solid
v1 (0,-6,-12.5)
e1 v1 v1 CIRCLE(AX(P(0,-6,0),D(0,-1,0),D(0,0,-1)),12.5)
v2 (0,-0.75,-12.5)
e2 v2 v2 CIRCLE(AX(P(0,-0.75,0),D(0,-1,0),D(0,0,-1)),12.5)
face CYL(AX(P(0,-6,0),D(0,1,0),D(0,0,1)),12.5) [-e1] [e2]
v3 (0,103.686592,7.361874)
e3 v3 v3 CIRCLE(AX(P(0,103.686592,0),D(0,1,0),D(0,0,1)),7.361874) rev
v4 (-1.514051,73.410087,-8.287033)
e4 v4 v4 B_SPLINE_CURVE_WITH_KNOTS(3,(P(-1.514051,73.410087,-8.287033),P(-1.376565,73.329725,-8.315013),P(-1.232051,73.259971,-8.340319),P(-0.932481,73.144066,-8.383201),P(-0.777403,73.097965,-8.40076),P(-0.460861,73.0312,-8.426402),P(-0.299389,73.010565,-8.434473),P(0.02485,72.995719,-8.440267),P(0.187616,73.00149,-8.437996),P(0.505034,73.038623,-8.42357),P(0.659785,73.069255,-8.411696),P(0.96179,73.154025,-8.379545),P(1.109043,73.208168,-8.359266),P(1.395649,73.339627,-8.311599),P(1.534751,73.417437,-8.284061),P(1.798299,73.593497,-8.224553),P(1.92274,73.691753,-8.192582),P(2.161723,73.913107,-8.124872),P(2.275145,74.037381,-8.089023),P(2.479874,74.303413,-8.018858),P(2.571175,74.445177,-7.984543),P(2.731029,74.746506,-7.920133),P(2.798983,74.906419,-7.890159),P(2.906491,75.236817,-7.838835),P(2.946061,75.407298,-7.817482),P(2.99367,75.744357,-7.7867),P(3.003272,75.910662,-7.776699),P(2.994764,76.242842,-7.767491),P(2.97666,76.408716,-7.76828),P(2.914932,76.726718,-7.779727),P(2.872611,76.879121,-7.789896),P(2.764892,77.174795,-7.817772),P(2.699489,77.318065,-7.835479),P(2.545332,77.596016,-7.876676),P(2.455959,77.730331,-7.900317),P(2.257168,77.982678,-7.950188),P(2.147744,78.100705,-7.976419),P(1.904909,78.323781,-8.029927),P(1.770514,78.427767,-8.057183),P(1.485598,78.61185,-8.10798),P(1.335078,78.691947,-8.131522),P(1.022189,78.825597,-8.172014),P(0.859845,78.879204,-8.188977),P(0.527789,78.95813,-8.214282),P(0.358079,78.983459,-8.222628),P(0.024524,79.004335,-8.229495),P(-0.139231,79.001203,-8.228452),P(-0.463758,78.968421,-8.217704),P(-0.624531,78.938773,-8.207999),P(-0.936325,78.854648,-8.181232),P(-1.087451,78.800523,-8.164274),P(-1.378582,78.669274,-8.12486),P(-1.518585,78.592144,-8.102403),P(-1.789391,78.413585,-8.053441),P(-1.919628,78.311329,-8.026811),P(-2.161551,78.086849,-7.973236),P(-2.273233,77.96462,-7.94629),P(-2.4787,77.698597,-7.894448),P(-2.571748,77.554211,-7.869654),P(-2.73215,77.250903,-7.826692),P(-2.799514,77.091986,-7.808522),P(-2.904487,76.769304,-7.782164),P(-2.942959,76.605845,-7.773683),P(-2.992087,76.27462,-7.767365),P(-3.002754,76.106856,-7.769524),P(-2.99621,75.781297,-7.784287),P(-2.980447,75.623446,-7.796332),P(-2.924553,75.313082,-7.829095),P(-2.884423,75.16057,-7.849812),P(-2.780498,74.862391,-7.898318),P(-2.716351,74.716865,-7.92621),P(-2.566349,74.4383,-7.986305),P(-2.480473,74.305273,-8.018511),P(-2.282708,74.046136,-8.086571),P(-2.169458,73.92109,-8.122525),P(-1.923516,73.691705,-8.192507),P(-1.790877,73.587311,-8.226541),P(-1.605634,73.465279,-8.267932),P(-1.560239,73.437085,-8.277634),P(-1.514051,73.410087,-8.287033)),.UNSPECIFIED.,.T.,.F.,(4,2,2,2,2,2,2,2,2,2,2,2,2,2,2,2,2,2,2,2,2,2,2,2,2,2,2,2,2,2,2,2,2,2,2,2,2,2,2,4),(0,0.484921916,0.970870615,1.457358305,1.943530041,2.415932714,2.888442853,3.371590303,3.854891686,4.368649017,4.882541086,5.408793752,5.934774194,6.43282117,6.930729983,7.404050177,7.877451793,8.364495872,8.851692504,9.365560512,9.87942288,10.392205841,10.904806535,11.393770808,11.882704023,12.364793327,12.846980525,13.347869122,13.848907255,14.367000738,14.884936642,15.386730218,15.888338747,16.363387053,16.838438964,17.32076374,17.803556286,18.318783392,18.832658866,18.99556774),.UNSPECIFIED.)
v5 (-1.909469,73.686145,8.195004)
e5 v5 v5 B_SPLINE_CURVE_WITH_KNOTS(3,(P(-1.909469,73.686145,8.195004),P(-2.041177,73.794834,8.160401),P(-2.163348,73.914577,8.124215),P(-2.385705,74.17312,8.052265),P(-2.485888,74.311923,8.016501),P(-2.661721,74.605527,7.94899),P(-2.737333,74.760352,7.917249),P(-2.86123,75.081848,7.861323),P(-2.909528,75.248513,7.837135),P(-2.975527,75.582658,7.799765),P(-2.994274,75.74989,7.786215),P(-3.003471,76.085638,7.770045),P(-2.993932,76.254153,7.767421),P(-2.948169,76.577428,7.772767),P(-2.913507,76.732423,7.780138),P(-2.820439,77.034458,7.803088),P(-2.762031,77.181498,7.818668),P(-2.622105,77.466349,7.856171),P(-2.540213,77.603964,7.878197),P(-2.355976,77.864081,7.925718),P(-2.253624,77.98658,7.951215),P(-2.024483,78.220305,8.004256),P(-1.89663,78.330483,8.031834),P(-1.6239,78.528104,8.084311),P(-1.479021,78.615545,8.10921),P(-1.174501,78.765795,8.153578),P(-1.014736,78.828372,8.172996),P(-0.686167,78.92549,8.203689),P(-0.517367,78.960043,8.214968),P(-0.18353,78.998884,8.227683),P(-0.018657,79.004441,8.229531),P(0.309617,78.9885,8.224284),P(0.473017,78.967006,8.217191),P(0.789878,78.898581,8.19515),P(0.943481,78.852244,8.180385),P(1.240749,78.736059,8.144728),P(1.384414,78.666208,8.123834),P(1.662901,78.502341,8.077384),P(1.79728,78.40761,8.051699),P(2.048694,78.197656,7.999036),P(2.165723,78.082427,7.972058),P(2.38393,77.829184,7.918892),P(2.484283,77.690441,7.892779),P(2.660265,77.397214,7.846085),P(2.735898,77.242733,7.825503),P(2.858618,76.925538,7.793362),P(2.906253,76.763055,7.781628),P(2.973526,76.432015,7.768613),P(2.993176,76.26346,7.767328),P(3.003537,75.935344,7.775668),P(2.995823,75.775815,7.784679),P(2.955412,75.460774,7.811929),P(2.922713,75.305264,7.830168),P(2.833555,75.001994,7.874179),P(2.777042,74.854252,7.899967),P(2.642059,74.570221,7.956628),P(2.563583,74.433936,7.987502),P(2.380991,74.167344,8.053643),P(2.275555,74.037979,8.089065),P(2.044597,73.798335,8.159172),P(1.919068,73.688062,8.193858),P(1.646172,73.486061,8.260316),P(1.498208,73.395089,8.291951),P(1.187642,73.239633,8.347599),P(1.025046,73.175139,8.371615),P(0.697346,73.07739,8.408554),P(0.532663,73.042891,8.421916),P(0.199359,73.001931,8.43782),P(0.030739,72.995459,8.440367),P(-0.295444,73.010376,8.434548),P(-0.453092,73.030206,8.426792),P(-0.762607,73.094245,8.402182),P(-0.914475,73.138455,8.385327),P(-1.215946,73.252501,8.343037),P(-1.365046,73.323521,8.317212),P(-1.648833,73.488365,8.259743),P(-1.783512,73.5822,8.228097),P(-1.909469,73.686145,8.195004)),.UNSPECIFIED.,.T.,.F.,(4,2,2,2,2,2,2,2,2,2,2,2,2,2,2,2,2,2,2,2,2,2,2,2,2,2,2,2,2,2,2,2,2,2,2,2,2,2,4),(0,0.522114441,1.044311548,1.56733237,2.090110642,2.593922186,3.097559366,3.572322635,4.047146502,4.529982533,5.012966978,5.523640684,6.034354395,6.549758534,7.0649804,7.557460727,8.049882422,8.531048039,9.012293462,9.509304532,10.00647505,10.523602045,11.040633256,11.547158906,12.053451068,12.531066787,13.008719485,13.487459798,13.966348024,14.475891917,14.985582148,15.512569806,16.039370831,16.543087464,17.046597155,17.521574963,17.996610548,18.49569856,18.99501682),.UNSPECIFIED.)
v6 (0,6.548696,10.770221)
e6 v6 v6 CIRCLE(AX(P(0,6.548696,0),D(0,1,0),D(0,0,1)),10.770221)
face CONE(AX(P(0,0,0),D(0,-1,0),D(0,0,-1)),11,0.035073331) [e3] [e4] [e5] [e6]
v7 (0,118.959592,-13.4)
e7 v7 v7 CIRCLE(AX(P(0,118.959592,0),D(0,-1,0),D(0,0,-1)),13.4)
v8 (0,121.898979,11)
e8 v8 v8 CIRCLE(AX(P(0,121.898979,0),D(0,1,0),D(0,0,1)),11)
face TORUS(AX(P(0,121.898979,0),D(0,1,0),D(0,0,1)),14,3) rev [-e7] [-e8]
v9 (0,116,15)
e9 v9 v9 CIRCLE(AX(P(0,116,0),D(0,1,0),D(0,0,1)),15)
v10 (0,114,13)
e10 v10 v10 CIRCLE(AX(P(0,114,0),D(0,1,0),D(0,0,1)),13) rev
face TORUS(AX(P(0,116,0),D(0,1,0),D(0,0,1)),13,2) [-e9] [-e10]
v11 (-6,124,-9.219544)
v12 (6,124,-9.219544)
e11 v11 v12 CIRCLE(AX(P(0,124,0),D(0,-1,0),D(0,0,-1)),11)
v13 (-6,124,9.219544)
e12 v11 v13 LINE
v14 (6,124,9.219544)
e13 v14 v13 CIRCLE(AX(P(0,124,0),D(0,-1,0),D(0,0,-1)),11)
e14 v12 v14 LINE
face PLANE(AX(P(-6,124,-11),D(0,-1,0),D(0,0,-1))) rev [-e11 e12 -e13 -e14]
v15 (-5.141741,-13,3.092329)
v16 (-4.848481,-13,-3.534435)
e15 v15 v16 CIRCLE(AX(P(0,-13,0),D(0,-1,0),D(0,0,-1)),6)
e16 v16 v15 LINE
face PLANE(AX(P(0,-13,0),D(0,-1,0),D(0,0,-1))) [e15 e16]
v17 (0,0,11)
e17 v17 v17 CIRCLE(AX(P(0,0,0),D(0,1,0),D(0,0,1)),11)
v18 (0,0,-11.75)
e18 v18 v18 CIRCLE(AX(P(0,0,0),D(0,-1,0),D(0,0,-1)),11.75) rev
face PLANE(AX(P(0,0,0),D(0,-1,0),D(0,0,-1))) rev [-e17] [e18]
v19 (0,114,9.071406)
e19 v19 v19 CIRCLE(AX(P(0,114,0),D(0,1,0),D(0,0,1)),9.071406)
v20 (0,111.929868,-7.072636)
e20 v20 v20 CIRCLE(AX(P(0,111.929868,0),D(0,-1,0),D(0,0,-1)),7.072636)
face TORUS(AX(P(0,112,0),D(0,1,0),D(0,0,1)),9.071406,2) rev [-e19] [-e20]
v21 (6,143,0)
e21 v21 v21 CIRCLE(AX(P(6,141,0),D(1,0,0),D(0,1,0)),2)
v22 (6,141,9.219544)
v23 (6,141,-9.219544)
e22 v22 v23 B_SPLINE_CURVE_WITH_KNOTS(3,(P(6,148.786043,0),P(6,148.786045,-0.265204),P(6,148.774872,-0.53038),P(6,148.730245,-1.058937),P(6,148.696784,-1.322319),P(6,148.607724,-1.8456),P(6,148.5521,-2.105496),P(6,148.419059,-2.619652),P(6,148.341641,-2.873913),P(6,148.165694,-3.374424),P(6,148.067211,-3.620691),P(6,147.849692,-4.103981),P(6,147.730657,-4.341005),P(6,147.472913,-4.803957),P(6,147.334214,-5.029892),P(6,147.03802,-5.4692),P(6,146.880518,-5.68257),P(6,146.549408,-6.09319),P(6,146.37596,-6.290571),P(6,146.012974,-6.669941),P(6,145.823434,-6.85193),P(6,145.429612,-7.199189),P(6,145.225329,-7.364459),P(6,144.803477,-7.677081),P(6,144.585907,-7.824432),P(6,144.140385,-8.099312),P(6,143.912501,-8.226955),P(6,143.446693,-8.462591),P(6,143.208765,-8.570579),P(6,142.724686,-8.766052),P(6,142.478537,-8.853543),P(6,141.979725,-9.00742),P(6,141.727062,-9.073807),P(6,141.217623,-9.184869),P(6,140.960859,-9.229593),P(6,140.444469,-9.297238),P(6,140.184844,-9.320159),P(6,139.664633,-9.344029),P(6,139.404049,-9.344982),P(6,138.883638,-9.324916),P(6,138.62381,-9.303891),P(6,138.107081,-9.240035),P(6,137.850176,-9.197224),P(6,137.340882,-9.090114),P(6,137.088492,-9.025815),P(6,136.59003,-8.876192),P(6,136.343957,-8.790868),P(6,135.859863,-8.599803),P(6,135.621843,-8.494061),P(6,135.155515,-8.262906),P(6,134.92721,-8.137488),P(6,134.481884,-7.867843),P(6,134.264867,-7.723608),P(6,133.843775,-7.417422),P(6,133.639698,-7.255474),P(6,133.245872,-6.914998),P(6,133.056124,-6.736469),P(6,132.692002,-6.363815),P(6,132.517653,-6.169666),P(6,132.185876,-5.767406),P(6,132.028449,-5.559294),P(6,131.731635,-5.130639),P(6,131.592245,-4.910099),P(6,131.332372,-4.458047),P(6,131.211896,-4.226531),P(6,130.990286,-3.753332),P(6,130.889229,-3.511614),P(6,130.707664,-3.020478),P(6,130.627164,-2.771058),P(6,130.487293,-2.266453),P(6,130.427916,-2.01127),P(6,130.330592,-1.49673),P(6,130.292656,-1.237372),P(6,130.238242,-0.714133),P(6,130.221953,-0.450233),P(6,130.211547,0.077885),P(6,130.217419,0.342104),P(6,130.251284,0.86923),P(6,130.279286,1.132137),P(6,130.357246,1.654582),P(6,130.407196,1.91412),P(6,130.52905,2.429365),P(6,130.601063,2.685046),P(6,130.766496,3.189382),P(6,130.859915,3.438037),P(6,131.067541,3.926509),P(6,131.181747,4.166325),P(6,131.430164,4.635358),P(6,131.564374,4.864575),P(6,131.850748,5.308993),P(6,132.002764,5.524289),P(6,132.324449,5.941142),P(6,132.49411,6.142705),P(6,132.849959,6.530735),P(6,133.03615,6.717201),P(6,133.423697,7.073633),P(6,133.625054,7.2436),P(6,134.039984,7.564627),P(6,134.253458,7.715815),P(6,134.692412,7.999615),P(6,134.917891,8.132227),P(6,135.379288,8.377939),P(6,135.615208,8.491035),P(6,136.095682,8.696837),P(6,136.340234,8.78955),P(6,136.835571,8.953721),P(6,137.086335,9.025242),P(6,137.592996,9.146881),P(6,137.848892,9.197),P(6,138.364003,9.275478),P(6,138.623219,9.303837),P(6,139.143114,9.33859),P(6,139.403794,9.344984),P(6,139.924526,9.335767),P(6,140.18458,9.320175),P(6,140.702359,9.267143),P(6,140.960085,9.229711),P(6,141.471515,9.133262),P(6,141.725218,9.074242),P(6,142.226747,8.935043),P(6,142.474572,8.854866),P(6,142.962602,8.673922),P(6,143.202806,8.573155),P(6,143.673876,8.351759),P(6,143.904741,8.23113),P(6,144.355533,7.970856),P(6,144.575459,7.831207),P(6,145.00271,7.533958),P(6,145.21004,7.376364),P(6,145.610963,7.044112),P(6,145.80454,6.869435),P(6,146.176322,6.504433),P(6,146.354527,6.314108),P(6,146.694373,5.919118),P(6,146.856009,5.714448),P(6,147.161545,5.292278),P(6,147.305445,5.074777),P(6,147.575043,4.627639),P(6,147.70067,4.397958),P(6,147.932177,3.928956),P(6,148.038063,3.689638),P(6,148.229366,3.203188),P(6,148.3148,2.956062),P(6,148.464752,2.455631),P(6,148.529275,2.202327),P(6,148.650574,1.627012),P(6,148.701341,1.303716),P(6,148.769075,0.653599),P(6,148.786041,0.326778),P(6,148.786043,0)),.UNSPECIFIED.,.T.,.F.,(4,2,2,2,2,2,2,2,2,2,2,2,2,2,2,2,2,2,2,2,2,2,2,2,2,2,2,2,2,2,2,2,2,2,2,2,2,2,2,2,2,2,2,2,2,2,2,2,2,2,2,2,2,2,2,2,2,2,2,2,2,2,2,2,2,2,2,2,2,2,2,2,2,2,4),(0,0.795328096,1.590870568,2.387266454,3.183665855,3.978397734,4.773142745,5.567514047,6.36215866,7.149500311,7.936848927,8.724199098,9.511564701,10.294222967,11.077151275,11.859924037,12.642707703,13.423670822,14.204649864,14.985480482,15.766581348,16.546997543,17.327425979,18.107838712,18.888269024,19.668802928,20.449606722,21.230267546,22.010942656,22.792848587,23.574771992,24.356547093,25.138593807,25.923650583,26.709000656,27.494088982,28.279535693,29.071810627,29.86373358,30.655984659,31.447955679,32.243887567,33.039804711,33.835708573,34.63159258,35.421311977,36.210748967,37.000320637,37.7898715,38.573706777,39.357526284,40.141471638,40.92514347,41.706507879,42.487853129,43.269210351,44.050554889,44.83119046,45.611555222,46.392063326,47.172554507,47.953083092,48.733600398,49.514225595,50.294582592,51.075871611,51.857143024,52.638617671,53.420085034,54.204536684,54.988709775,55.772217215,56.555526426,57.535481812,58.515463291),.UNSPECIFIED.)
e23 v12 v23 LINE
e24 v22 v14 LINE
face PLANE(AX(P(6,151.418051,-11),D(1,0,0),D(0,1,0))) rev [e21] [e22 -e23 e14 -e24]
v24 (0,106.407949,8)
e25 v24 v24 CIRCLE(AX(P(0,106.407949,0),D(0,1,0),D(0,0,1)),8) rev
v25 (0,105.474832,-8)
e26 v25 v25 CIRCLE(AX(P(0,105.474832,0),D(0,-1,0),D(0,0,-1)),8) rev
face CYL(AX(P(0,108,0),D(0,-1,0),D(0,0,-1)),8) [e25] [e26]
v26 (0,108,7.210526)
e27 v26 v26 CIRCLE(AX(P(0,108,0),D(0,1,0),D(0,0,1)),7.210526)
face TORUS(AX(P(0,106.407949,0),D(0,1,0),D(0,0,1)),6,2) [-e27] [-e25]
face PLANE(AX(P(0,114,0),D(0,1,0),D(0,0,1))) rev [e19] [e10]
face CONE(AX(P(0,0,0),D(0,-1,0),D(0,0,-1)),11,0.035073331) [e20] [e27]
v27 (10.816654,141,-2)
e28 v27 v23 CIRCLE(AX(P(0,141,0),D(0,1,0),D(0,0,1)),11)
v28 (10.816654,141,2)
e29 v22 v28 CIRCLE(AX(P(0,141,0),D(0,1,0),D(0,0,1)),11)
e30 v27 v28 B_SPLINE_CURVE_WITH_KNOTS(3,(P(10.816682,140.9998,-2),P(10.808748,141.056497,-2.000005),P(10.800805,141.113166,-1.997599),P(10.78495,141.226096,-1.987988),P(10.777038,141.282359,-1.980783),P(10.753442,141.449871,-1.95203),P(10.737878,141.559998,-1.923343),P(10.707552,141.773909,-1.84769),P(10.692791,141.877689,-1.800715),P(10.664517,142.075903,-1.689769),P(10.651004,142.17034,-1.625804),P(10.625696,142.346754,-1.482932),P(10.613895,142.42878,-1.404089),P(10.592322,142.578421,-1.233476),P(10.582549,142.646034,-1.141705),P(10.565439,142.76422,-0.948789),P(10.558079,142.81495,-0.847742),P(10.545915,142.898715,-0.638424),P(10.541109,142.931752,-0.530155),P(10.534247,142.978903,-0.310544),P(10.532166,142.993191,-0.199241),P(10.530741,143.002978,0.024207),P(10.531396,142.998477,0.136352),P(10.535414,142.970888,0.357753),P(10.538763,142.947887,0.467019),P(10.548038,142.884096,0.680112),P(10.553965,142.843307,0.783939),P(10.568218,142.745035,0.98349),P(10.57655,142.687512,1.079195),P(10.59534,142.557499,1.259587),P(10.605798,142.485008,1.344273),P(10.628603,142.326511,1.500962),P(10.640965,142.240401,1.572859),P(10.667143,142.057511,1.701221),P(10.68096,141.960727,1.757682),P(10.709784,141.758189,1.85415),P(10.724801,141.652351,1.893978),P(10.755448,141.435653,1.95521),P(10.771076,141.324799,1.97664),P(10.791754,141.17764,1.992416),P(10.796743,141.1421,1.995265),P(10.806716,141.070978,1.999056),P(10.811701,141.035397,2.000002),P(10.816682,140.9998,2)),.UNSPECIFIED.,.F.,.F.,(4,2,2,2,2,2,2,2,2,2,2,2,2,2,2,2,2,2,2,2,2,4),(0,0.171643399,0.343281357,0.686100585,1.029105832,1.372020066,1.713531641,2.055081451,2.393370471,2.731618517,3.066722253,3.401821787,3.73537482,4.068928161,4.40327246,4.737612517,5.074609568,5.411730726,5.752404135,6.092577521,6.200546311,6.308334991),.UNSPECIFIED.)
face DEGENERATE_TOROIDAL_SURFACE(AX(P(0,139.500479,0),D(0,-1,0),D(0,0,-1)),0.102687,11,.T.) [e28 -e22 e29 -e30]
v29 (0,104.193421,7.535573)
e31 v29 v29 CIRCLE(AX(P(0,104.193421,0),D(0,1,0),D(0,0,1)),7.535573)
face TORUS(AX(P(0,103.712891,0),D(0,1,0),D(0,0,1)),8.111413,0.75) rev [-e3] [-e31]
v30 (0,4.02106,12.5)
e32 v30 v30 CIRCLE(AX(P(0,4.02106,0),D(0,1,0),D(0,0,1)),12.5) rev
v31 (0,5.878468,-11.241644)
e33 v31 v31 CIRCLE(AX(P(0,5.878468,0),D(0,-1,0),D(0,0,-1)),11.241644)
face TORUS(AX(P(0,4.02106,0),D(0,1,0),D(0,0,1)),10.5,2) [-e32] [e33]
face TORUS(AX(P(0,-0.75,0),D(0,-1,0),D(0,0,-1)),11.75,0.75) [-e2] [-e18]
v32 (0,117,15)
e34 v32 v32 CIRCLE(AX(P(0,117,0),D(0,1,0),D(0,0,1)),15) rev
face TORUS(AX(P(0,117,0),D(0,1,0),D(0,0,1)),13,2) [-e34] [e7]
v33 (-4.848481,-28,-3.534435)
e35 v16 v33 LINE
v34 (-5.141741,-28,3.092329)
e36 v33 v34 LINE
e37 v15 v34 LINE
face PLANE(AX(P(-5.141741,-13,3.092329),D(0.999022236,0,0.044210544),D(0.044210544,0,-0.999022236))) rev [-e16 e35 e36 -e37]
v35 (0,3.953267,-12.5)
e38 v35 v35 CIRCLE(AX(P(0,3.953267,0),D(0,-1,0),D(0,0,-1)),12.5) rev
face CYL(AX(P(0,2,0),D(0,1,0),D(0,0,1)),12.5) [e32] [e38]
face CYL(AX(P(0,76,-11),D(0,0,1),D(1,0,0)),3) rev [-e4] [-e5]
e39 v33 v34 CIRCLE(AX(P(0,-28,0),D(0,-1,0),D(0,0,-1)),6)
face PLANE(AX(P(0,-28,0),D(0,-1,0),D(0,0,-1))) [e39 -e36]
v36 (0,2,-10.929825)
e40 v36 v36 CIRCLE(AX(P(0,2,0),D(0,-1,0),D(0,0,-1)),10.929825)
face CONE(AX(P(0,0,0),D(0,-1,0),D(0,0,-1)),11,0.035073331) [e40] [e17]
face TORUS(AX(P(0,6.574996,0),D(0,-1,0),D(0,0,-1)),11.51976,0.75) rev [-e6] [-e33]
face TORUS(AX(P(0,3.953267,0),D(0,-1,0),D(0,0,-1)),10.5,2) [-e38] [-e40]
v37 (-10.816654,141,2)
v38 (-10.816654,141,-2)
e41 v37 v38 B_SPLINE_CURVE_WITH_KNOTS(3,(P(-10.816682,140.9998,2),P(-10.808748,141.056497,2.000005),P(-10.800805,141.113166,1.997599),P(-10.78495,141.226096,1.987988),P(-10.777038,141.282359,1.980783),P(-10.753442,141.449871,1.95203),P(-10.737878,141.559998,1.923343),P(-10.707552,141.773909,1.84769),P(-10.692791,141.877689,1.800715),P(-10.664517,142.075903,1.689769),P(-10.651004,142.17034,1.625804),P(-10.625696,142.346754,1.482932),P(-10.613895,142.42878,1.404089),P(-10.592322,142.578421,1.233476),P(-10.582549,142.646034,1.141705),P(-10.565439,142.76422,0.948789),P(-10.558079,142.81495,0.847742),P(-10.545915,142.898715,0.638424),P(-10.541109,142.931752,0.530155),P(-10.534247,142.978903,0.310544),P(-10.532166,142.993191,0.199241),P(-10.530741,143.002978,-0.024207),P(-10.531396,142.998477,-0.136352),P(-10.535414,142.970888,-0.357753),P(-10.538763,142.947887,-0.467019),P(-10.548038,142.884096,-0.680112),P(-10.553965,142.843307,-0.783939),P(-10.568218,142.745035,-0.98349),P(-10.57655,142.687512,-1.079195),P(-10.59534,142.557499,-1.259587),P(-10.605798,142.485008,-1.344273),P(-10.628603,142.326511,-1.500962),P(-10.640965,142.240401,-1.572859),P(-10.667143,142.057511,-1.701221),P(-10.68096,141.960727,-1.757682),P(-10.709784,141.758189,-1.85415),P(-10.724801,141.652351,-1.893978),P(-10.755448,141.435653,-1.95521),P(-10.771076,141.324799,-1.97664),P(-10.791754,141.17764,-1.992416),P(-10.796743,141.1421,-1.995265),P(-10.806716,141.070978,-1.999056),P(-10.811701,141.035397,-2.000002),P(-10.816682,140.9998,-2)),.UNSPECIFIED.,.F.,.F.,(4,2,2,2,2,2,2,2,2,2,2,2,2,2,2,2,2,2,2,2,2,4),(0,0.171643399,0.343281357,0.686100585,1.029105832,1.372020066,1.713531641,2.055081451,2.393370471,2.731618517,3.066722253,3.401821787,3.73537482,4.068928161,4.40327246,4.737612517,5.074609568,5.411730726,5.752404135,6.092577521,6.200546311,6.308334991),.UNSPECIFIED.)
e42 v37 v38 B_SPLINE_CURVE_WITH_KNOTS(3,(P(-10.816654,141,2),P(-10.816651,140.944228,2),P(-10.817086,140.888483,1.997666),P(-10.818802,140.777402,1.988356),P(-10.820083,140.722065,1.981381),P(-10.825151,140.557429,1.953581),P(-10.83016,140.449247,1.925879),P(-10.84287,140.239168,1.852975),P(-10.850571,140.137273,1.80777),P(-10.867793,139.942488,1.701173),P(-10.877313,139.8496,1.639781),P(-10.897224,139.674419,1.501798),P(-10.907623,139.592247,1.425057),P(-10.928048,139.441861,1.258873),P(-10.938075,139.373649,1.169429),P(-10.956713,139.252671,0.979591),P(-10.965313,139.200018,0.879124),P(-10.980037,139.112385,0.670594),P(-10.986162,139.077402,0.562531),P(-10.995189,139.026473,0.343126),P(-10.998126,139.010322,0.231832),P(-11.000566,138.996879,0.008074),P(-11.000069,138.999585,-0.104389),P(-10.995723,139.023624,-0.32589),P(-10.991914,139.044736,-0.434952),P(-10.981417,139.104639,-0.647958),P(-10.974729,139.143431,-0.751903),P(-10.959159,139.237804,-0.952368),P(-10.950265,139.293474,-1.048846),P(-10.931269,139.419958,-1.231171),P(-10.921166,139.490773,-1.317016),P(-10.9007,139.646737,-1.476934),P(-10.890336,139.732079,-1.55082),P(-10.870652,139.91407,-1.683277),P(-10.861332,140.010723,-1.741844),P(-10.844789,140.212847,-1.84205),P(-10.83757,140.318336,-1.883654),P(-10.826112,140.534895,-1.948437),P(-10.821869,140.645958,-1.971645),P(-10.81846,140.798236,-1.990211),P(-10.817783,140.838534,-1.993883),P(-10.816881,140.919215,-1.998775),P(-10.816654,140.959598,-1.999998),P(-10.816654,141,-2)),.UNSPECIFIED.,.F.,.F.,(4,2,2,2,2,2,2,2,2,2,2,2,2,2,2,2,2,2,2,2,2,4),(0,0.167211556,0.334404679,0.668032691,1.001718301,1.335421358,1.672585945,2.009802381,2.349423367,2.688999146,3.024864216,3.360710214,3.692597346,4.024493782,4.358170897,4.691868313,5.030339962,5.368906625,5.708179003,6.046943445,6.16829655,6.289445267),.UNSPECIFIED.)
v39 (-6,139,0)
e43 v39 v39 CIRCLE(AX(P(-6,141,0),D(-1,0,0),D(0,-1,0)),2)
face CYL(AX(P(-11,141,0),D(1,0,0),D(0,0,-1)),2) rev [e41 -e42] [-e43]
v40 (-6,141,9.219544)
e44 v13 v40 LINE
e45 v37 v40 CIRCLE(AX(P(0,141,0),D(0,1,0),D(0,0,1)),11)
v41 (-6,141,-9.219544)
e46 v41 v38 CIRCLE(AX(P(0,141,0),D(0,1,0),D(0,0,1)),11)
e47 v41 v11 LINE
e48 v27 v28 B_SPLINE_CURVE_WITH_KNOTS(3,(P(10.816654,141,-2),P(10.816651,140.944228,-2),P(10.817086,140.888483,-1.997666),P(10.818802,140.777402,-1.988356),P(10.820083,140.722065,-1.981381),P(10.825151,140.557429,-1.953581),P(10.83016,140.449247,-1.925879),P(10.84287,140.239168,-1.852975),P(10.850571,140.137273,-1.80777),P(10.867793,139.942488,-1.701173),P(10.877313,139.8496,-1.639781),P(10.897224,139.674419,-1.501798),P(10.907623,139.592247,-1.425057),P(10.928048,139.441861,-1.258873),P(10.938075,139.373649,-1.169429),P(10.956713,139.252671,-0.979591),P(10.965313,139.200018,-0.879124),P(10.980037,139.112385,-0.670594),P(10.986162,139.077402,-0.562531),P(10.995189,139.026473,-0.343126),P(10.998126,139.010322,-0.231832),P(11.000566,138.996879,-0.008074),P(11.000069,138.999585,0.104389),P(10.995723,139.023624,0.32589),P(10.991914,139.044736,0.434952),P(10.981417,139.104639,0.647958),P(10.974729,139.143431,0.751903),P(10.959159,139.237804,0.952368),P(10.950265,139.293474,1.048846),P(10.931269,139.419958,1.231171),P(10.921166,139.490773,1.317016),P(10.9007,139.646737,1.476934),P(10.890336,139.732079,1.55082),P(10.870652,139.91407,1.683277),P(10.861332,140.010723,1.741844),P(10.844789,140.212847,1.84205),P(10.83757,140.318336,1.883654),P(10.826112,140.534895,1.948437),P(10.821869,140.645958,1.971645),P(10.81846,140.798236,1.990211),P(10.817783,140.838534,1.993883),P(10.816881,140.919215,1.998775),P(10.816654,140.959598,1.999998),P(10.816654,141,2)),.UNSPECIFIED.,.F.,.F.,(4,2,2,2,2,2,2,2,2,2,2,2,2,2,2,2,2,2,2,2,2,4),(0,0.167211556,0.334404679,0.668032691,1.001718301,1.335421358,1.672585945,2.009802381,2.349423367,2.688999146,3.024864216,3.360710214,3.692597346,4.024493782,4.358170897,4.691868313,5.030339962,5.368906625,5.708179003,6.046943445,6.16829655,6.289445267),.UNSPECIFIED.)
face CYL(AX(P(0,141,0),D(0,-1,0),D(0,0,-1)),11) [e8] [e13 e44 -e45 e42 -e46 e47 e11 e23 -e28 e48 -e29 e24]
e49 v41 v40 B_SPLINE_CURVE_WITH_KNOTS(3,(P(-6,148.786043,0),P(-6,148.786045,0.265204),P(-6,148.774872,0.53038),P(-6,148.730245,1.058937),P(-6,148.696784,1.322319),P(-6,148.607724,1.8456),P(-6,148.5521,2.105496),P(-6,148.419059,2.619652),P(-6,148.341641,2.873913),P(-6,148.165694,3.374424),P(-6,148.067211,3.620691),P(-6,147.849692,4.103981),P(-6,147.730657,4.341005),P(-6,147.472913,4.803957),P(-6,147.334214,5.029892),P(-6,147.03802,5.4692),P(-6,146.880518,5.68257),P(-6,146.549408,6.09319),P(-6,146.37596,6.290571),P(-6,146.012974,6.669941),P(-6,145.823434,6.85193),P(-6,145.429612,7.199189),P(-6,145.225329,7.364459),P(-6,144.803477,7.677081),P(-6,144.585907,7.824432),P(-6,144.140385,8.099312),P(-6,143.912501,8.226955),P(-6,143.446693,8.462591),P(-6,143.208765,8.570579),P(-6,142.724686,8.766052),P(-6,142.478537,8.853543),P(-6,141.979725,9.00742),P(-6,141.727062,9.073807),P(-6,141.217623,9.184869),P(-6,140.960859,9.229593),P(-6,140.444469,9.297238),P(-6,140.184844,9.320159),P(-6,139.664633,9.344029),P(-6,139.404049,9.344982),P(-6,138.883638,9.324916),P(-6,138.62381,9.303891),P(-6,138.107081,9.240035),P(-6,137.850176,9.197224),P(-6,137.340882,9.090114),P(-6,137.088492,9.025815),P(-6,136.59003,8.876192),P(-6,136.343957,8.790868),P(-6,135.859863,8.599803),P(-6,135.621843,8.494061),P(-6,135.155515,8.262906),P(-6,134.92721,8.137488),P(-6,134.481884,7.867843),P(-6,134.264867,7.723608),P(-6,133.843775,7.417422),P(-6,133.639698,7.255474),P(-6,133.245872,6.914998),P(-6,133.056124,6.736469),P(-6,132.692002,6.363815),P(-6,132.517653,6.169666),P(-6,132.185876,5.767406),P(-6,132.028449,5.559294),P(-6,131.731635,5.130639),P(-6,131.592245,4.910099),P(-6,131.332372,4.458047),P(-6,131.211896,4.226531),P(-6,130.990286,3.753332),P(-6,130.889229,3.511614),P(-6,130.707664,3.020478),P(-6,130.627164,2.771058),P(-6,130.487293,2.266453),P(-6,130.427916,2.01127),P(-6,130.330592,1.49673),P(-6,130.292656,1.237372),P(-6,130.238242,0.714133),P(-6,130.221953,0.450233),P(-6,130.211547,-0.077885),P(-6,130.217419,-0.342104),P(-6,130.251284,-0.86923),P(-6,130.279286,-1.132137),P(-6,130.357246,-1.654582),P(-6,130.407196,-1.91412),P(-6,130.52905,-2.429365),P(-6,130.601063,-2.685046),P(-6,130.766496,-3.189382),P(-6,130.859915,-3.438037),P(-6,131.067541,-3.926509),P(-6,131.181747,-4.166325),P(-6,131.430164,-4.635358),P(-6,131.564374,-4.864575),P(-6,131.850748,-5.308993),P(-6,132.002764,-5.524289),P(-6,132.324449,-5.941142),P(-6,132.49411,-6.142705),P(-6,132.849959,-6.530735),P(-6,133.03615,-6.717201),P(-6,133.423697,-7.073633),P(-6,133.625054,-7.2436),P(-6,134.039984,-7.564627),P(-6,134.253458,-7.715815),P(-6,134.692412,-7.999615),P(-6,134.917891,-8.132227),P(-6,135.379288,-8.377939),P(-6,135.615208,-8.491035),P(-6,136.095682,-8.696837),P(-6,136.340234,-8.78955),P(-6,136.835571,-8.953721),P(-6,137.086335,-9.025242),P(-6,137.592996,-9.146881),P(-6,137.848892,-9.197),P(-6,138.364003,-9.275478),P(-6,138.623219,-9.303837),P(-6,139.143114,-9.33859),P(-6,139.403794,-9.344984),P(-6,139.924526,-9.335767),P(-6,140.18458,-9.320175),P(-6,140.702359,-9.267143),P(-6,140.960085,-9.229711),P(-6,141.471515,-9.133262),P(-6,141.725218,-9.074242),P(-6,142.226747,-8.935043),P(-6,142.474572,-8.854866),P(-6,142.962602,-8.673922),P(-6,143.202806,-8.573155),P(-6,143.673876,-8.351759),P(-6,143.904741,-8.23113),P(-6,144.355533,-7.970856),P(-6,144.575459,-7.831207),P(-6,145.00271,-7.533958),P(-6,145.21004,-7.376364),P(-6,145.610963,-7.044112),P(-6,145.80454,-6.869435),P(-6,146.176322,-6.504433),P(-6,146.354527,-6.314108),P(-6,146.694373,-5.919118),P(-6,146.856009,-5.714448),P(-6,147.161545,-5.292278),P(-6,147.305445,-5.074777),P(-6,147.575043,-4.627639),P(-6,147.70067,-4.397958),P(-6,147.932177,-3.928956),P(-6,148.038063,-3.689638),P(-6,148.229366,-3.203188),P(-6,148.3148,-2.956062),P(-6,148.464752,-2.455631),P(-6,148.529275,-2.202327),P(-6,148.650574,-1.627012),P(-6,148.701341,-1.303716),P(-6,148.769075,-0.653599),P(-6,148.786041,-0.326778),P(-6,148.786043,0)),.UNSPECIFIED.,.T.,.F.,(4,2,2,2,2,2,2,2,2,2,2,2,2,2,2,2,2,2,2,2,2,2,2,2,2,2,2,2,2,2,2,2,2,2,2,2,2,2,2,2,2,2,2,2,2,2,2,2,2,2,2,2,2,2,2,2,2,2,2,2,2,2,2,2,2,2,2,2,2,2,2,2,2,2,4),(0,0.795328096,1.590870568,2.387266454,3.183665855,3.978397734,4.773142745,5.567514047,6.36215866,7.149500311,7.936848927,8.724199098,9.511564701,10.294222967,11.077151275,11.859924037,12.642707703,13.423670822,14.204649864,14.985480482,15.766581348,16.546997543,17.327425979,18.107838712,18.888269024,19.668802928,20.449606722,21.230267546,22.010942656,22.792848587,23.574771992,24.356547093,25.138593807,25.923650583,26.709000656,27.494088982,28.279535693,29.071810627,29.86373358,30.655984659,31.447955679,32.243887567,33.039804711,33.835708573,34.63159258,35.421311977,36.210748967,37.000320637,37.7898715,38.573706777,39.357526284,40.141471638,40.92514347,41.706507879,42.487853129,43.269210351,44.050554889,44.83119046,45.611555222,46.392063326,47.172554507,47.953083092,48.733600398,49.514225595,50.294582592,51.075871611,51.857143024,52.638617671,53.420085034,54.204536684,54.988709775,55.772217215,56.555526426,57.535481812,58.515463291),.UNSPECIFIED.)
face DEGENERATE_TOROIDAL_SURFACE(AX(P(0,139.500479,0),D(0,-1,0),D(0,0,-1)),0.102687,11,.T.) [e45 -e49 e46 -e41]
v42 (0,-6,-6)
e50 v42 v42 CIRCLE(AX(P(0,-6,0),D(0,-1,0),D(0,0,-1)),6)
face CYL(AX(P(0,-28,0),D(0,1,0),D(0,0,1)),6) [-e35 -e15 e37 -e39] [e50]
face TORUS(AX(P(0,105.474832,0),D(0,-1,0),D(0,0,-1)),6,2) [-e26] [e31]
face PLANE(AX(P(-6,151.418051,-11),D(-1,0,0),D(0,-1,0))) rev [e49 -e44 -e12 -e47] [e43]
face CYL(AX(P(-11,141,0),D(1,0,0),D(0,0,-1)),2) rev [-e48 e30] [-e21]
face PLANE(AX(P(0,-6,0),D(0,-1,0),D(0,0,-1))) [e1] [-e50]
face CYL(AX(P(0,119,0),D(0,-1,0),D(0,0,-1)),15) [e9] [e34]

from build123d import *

# Parameters (mm, degrees)
SKETCH3_R           = 12.5
BOSS_EXTRUDE1_DEPTH = 6
BOSS_EXTRUDE4_START = -12
SKETCH6_R           = 12.5
BOSS_EXTRUDE4_DEPTH = 4
FILLET1_R           = 2
FILLET2_R           = 0.75
SKETCH7_R           = 6
BOSS_EXTRUDE5_DEPTH = 22
CUT_EXTRUDE2_START  = -15
CUT_EXTRUDE2_DEPTH  = 15
BOSS_EXTRUDE6_START = -8
SKETCH9_R           = 8
BOSS_EXTRUDE6_DEPTH = 2
FILLET3_R           = 2
FILLET4_R           = 0.75
SKETCH10_R          = 15
BOSS_EXTRUDE7_DEPTH = 5
SKETCH11_R          = 11
BOSS_EXTRUDE8_DEPTH = 22
FILLET5_R           = 2
FILLET6_R           = 3
FILLET7_R           = 2
SKETCH14_W          = 12
SKETCH14_H          = 27.418051074
CUT_EXTRUDE3_DEPTH  = 11
SKETCH15_R          = 3
CUT_EXTRUDE4_DEPTH  = 11
SKETCH16_R          = 2
CUT_EXTRUDE5_DEPTH  = 11


with BuildPart() as part:
    # Sketch2 → Revolve2 (revolve)
    with BuildSketch(Plane.XY, mode=Mode.PRIVATE) as revolve2_sk:
        Polygon((0, 0), (11, 0), (7, 114), (0, 114), align=None)
    revolve(revolve2_sk.sketch.rotate(Axis((0, 114, 0), (0, -1, 0)), 90), axis=Axis((0, 114, 0), (0, -1, 0)))

    # Sketch3 → Boss-Extrude1 (add)
    with BuildSketch(Plane.XZ):
        with Locations(Location((0, 0, 0), (0, 0, 270))):
            Circle(SKETCH3_R)
    extrude(amount=BOSS_EXTRUDE1_DEPTH)

    # Sketch6 → Boss-Extrude4 (add)
    with BuildSketch(Plane.XZ.offset(6).offset(BOSS_EXTRUDE4_START)):
        with Locations(Location((0, 0, 0), (0, 0, 270))):
            Circle(SKETCH6_R)
    extrude(amount=BOSS_EXTRUDE4_DEPTH)

    # Fillet1
    # the kernel refuses this fillet: 2 mm, written as the material it takes off along each edge
    with BuildSketch(Plane(origin=(0, 6, 0), x_dir=(0, 0, -1), z_dir=(-1, 0, 0))) as fillet1_piece_1:
        with BuildLine():
            CenterArc((10.5, 1.97894037), FILLET1_R, 278.322040599, 81.677959401)
            Line((10.789473684, 0), (10.795263158, -0.039578807))
            ThreePointArc((10.795263158, -0.039578807), (11.644736842, -0.04), (12.5, -0.04))
            Line((12.5, -0.04), (12.54, 0))
            Line((12.54, 0), (12.54, 1.97894037))
            Line((12.54, 1.97894037), (12.5, 1.97894037))
        make_face()
    revolve(axis=Axis((0, 6, 0), (0, -1, 0)), mode=Mode.SUBTRACT)
    with BuildSketch(Plane(origin=(0, 2, 0), x_dir=(0, 0, -1), z_dir=(-1, 0, 0))) as fillet1_piece_2:
        with BuildLine():
            CenterArc((10.5, -1.953266712), FILLET1_R, 0, 77.589618941)
            Line((12.5, -1.953266712), (12.54, -1.953266712))
            Line((12.54, -1.953266712), (12.54, 0))
            Line((12.54, 0), (12.5, 0.04))
            ThreePointArc((12.5, 0.04), (11.714912281, 0.04), (10.938421053, 0.039065334))
            Line((10.938421053, 0.039065334), (10.929824561, 0))
        make_face()
    revolve(axis=Axis((0, 2, 0), (0, -1, 0)), mode=Mode.SUBTRACT)

    # Fillet2
    fillet2_edges = [part.edges().sort_by_distance(p)[0] for p in [
        (0, 0, 12.5),
        (10.789473684, 6, 0),
    ]]
    fillet(fillet2_edges, radius=FILLET2_R)

    # Sketch7 → Boss-Extrude5 (add)
    with BuildSketch(Plane.XZ.offset(6)):
        with Locations(Location((0, 0, 0), (0, 0, 270))):
            Circle(SKETCH7_R)
    extrude(amount=BOSS_EXTRUDE5_DEPTH)

    # Sketch8 → Cut-Extrude2 (cut)
    with BuildSketch(Plane.XZ.offset(28).offset(CUT_EXTRUDE2_START)):
        with BuildLine():
            Line((-5.141740966, 3.092329192), (-4.848481392, -3.534434635))
            ThreePointArc((-4.848481392, -3.534434635), (-5.994133415, -0.265263266), (-5.141740966, 3.092329192))
        make_face()
    extrude(amount=CUT_EXTRUDE2_DEPTH, mode=Mode.SUBTRACT)

    # Sketch9 → Boss-Extrude6 (add, symmetric)
    with BuildSketch(Plane(origin=(0, 114, 0), x_dir=(1, 0, 0), z_dir=(0, 1, 0)).offset(BOSS_EXTRUDE6_START)):
        with Locations(Location((0, 0, 0), (0, 0, 270))):
            Circle(SKETCH9_R)
    extrude(amount=BOSS_EXTRUDE6_DEPTH, both=True)

    # Fillet3
    # the kernel refuses this fillet: 2 mm, written as the material it takes off along each edge
    with BuildSketch(Plane(origin=(0, 104, 0), x_dir=(0, 0, 1), z_dir=(-1, 0, 0))) as fillet3_piece_1:
        with BuildLine():
            CenterArc((6, 1.474832468), FILLET3_R, 312.488219007, 47.511780993)
            Line((8, 1.474832468), (8.04, 1.474832468))
            Line((8.04, 1.474832468), (8.04, 0))
            Line((8.04, 0), (8, -0.04))
            ThreePointArc((8, -0.04), (7.675438596, -0.04), (7.377894737, -0.029496649))
            Line((7.377894737, -0.029496649), (7.350877193, 0))
        make_face()
    revolve(axis=Axis((0, 104, 0), (0, 1, 0)), mode=Mode.SUBTRACT)
    with BuildSketch(Plane(origin=(0, 108, 0), x_dir=(0, 0, 1), z_dir=(-1, 0, 0))) as fillet3_piece_2:
        with BuildLine():
            CenterArc((6, -1.592050891), FILLET3_R, 0, 52.752219104)
            Line((7.210526316, 0), (7.234736842, 0.031841018))
            ThreePointArc((7.234736842, 0.031841018), (7.605263158, 0.04), (8, 0.04))
            Line((8, 0.04), (8.04, 0))
            Line((8.04, 0), (8.04, -1.592050891))
            Line((8.04, -1.592050891), (8, -1.592050891))
        make_face()
    revolve(axis=Axis((0, 108, 0), (0, 1, 0)), mode=Mode.SUBTRACT)

    # Fillet4
    fillet4_edges = [part.edges().sort_by_distance(p)[0] for p in [
        (0, 104, -7.350877193),
    ]]
    fillet(fillet4_edges, radius=FILLET4_R)

    # Sketch10 → Boss-Extrude7 (add)
    with BuildSketch(Plane(origin=(0, 114, 0), x_dir=(1, 0, 0), z_dir=(0, 1, 0))):
        with Locations(Location((0, 0, 0), (0, 0, 270))):
            Circle(SKETCH10_R)
    extrude(amount=BOSS_EXTRUDE7_DEPTH)

    # Sketch11 → Boss-Extrude8 (add)
    with BuildSketch(Plane(origin=(0, 119, 0), x_dir=(1, 0, 0), z_dir=(0, 1, 0))):
        with Locations(Location((0, 0, 0), (0, 0, 270))):
            Circle(SKETCH11_R)
    extrude(amount=BOSS_EXTRUDE8_DEPTH)

    # Fillet5
    fillet5_edges = [part.edges().sort_by_distance(p)[0] for p in [
        (0, 114, -15),
        (0, 119, -15),
    ]]
    fillet(fillet5_edges, radius=FILLET5_R)

    # Fillet6
    fillet6_edges = [part.edges().sort_by_distance(p)[0] for p in [
        (0, 119, -11),
    ]]
    fillet(fillet6_edges, radius=FILLET6_R)

    # Fillet7
    fillet7_edges = [part.edges().sort_by_distance(p)[0] for p in [
        (0, 114, -7),
    ]]
    fillet(fillet7_edges, radius=FILLET7_R)

    # Sketch13 → Revolve4 (revolve)
    with BuildSketch(Plane.XY, mode=Mode.PRIVATE) as revolve4_sk:
        with BuildLine():
            Line((11, 141), (0, 141))
            Line((0, 141), (0, 150.5))
            ThreePointArc((0, 150.5), (7.292505249, 147.825532394), (11, 141))
        make_face()
    revolve(revolve4_sk.sketch.rotate(Axis((0, 141, 0), (0, 1, 0)), 270), axis=Axis((0, 141, 0), (0, 1, 0)))

    # Sketch14 → Cut-Extrude3 (cut, symmetric)
    with BuildSketch(Plane.XY):
        with Locations((0, 137.709025537)):
            Rectangle(SKETCH14_W, SKETCH14_H)
    extrude(amount=CUT_EXTRUDE3_DEPTH, both=True, mode=Mode.SUBTRACT)

    # Sketch15 → Cut-Extrude4 (cut, symmetric)
    with BuildSketch(Plane.XY):
        with Locations(Location((0, 76, 0), (0, 0, 270.000000086))):
            Circle(SKETCH15_R)
    extrude(amount=CUT_EXTRUDE4_DEPTH, both=True, mode=Mode.SUBTRACT)

    # Sketch16 → Cut-Extrude5 (cut, symmetric)
    with BuildSketch(Plane(origin=(0, 0, 0), x_dir=(0, 0, -1), z_dir=(1, 0, 0))):
        with Locations((0, 141)):
            Circle(SKETCH16_R)
    extrude(amount=CUT_EXTRUDE5_DEPTH, both=True, mode=Mode.SUBTRACT)


solid = part.part
